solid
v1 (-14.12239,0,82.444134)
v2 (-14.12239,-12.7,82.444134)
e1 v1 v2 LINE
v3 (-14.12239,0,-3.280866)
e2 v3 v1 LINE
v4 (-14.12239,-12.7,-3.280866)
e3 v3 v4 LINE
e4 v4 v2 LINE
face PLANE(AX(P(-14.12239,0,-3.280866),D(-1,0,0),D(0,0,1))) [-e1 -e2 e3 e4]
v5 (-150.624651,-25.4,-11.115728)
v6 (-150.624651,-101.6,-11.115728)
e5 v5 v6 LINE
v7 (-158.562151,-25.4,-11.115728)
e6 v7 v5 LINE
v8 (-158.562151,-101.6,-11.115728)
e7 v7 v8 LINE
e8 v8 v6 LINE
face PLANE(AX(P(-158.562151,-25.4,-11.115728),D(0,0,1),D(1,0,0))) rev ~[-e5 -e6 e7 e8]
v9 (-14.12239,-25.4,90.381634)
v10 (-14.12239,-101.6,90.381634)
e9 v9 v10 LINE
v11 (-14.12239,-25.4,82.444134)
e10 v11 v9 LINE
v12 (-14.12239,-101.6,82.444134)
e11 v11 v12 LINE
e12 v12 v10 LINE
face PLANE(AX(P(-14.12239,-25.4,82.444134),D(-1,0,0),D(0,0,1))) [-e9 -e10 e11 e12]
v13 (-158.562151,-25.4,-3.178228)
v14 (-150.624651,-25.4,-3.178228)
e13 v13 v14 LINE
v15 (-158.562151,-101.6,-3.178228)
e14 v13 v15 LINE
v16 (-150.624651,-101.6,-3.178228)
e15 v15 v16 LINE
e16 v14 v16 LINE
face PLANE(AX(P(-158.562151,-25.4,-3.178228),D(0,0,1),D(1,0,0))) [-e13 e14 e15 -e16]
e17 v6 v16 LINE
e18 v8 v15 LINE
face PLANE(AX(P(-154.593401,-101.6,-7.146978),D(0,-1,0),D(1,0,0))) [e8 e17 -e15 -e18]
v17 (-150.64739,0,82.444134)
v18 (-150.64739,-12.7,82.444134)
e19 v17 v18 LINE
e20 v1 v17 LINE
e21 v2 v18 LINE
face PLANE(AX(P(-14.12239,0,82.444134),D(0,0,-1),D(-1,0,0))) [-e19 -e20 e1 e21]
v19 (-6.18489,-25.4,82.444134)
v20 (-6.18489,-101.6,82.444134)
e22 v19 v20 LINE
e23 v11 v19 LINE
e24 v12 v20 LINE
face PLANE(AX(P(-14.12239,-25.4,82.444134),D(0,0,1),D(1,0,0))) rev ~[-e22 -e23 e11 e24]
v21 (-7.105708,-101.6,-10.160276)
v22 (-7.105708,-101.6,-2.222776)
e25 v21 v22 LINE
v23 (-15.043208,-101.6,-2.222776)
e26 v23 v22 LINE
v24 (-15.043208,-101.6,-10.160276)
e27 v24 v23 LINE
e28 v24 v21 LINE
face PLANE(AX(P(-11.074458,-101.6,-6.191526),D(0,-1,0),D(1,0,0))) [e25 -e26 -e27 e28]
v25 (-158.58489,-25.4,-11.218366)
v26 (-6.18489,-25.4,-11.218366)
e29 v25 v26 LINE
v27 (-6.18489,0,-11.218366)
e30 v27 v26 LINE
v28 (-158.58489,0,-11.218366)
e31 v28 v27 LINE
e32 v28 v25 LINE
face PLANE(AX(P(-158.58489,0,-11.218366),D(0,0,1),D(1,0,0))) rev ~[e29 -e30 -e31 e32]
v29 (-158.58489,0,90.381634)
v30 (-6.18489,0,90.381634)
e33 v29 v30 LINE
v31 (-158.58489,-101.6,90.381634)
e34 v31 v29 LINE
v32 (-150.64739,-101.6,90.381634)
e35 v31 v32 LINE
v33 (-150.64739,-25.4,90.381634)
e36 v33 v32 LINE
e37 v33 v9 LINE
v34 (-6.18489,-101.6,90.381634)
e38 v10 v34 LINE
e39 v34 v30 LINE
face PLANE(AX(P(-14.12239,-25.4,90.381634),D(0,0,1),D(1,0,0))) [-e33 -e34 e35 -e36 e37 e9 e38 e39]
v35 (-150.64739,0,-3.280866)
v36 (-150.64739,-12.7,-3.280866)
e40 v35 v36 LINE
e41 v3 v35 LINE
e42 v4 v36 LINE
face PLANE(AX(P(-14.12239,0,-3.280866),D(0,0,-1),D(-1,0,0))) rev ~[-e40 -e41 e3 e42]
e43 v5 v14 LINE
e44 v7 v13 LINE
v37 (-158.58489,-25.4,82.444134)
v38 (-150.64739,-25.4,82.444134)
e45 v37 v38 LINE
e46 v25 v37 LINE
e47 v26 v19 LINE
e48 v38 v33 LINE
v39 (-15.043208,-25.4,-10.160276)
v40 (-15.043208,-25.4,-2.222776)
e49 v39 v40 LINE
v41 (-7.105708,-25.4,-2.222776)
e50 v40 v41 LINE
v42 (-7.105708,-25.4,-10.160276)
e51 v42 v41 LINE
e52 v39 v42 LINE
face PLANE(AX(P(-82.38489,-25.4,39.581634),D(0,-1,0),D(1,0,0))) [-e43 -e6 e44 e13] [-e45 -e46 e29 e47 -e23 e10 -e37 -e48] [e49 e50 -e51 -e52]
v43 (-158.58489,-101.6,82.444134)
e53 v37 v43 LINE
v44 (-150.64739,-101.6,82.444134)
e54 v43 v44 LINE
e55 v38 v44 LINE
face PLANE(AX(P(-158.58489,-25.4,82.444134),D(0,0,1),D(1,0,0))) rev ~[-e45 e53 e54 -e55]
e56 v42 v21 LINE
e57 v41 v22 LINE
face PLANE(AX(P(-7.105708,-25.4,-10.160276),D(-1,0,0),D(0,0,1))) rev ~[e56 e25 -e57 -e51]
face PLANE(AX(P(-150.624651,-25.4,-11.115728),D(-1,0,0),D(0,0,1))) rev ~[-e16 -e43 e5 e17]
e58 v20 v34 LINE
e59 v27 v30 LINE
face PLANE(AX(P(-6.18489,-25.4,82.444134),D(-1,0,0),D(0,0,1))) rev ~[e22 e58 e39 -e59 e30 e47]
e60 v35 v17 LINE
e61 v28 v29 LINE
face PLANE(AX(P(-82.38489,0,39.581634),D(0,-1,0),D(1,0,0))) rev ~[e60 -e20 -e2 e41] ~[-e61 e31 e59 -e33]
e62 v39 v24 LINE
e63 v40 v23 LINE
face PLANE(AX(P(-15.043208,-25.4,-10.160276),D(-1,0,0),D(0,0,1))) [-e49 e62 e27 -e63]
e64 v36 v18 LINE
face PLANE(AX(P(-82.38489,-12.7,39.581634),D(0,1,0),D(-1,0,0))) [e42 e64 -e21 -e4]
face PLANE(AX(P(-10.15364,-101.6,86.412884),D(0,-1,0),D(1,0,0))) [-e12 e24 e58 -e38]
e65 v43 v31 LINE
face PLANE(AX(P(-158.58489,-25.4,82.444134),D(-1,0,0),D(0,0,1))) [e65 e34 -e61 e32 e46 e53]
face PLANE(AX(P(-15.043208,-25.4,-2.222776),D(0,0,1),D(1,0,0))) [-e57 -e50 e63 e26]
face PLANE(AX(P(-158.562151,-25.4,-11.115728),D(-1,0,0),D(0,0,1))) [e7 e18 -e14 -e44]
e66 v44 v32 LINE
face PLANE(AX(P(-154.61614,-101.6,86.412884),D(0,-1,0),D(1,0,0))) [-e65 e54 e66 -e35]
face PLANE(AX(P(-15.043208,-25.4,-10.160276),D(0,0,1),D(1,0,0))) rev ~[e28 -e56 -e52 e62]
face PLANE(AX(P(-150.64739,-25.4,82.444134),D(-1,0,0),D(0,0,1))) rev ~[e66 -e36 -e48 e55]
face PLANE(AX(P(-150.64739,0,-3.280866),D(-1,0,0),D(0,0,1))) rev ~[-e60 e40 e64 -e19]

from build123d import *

# Parameters (mm, degrees)
F0_W      = 152.4
F0_H      = 101.6
F1_DEPTH  = 25.4
F2_W      = 7.9375
F2_H      = 7.9375
F3_DEPTH  = 76.2
F4_W      = 7.9375
F4_H      = 7.9375
F7_DEPTH  = 76.2
F5_W      = 7.9375
F5_H      = 7.9375
F8_DEPTH  = 76.2
F6_W      = 7.9375
F6_H      = 7.9375
F9_DEPTH  = 76.2
F10_W     = 136.525
F10_H     = 85.725
F11_DEPTH = 12.7


# Not quite as in the source:
# - a length typed as a fraction of an inch, garbled in the dataset ("3 / 203.2 mm" for 3/8 in), is restored


with BuildPart() as f1:
    # F0 (on Front) → F1 (new body)
    with BuildSketch(Plane.XZ):
        with Locations((-82.3848899454, 39.5816343878)):
            Rectangle(F0_W, F0_H)
    extrude(amount=F1_DEPTH)

    # F2 (on face) → F3 (join)
    with BuildSketch(Plane.XZ.offset(25.4)):
        with Locations((-154.6161399454, 86.4128843878)):
            Rectangle(F2_W, F2_H)
    extrude(amount=F3_DEPTH)

    # F4 (on face) → F7 (join)
    with BuildSketch(Plane.XZ.offset(25.4)):
        with Locations((-10.1536399454, 86.4128843878)):
            Rectangle(F4_W, F4_H)
    extrude(amount=F7_DEPTH)

    # F5 (on face) → F8 (join)
    with BuildSketch(Plane.XZ.offset(25.4)):
        with Locations((-154.5934006572, -7.1469780084)):
            Rectangle(F5_W, F5_H)
    extrude(amount=F8_DEPTH)

    # F6 (on face) → F9 (join)
    with BuildSketch(Plane.XZ.offset(25.4)):
        with Locations((-11.0744582489, -6.1915257747)):
            Rectangle(F6_W, F6_H)
    extrude(amount=F9_DEPTH)

    # F10 (on face) → F11 (cut)
    with BuildSketch(Plane(origin=(0, 0, 0), x_dir=(-1, 0, 0), z_dir=(0, 1, 0))):
        with Locations((82.3848899454, 39.5816343878)):
            Rectangle(F10_W, F10_H)
    extrude(amount=-F11_DEPTH, mode=Mode.SUBTRACT)


solid = f1.part
